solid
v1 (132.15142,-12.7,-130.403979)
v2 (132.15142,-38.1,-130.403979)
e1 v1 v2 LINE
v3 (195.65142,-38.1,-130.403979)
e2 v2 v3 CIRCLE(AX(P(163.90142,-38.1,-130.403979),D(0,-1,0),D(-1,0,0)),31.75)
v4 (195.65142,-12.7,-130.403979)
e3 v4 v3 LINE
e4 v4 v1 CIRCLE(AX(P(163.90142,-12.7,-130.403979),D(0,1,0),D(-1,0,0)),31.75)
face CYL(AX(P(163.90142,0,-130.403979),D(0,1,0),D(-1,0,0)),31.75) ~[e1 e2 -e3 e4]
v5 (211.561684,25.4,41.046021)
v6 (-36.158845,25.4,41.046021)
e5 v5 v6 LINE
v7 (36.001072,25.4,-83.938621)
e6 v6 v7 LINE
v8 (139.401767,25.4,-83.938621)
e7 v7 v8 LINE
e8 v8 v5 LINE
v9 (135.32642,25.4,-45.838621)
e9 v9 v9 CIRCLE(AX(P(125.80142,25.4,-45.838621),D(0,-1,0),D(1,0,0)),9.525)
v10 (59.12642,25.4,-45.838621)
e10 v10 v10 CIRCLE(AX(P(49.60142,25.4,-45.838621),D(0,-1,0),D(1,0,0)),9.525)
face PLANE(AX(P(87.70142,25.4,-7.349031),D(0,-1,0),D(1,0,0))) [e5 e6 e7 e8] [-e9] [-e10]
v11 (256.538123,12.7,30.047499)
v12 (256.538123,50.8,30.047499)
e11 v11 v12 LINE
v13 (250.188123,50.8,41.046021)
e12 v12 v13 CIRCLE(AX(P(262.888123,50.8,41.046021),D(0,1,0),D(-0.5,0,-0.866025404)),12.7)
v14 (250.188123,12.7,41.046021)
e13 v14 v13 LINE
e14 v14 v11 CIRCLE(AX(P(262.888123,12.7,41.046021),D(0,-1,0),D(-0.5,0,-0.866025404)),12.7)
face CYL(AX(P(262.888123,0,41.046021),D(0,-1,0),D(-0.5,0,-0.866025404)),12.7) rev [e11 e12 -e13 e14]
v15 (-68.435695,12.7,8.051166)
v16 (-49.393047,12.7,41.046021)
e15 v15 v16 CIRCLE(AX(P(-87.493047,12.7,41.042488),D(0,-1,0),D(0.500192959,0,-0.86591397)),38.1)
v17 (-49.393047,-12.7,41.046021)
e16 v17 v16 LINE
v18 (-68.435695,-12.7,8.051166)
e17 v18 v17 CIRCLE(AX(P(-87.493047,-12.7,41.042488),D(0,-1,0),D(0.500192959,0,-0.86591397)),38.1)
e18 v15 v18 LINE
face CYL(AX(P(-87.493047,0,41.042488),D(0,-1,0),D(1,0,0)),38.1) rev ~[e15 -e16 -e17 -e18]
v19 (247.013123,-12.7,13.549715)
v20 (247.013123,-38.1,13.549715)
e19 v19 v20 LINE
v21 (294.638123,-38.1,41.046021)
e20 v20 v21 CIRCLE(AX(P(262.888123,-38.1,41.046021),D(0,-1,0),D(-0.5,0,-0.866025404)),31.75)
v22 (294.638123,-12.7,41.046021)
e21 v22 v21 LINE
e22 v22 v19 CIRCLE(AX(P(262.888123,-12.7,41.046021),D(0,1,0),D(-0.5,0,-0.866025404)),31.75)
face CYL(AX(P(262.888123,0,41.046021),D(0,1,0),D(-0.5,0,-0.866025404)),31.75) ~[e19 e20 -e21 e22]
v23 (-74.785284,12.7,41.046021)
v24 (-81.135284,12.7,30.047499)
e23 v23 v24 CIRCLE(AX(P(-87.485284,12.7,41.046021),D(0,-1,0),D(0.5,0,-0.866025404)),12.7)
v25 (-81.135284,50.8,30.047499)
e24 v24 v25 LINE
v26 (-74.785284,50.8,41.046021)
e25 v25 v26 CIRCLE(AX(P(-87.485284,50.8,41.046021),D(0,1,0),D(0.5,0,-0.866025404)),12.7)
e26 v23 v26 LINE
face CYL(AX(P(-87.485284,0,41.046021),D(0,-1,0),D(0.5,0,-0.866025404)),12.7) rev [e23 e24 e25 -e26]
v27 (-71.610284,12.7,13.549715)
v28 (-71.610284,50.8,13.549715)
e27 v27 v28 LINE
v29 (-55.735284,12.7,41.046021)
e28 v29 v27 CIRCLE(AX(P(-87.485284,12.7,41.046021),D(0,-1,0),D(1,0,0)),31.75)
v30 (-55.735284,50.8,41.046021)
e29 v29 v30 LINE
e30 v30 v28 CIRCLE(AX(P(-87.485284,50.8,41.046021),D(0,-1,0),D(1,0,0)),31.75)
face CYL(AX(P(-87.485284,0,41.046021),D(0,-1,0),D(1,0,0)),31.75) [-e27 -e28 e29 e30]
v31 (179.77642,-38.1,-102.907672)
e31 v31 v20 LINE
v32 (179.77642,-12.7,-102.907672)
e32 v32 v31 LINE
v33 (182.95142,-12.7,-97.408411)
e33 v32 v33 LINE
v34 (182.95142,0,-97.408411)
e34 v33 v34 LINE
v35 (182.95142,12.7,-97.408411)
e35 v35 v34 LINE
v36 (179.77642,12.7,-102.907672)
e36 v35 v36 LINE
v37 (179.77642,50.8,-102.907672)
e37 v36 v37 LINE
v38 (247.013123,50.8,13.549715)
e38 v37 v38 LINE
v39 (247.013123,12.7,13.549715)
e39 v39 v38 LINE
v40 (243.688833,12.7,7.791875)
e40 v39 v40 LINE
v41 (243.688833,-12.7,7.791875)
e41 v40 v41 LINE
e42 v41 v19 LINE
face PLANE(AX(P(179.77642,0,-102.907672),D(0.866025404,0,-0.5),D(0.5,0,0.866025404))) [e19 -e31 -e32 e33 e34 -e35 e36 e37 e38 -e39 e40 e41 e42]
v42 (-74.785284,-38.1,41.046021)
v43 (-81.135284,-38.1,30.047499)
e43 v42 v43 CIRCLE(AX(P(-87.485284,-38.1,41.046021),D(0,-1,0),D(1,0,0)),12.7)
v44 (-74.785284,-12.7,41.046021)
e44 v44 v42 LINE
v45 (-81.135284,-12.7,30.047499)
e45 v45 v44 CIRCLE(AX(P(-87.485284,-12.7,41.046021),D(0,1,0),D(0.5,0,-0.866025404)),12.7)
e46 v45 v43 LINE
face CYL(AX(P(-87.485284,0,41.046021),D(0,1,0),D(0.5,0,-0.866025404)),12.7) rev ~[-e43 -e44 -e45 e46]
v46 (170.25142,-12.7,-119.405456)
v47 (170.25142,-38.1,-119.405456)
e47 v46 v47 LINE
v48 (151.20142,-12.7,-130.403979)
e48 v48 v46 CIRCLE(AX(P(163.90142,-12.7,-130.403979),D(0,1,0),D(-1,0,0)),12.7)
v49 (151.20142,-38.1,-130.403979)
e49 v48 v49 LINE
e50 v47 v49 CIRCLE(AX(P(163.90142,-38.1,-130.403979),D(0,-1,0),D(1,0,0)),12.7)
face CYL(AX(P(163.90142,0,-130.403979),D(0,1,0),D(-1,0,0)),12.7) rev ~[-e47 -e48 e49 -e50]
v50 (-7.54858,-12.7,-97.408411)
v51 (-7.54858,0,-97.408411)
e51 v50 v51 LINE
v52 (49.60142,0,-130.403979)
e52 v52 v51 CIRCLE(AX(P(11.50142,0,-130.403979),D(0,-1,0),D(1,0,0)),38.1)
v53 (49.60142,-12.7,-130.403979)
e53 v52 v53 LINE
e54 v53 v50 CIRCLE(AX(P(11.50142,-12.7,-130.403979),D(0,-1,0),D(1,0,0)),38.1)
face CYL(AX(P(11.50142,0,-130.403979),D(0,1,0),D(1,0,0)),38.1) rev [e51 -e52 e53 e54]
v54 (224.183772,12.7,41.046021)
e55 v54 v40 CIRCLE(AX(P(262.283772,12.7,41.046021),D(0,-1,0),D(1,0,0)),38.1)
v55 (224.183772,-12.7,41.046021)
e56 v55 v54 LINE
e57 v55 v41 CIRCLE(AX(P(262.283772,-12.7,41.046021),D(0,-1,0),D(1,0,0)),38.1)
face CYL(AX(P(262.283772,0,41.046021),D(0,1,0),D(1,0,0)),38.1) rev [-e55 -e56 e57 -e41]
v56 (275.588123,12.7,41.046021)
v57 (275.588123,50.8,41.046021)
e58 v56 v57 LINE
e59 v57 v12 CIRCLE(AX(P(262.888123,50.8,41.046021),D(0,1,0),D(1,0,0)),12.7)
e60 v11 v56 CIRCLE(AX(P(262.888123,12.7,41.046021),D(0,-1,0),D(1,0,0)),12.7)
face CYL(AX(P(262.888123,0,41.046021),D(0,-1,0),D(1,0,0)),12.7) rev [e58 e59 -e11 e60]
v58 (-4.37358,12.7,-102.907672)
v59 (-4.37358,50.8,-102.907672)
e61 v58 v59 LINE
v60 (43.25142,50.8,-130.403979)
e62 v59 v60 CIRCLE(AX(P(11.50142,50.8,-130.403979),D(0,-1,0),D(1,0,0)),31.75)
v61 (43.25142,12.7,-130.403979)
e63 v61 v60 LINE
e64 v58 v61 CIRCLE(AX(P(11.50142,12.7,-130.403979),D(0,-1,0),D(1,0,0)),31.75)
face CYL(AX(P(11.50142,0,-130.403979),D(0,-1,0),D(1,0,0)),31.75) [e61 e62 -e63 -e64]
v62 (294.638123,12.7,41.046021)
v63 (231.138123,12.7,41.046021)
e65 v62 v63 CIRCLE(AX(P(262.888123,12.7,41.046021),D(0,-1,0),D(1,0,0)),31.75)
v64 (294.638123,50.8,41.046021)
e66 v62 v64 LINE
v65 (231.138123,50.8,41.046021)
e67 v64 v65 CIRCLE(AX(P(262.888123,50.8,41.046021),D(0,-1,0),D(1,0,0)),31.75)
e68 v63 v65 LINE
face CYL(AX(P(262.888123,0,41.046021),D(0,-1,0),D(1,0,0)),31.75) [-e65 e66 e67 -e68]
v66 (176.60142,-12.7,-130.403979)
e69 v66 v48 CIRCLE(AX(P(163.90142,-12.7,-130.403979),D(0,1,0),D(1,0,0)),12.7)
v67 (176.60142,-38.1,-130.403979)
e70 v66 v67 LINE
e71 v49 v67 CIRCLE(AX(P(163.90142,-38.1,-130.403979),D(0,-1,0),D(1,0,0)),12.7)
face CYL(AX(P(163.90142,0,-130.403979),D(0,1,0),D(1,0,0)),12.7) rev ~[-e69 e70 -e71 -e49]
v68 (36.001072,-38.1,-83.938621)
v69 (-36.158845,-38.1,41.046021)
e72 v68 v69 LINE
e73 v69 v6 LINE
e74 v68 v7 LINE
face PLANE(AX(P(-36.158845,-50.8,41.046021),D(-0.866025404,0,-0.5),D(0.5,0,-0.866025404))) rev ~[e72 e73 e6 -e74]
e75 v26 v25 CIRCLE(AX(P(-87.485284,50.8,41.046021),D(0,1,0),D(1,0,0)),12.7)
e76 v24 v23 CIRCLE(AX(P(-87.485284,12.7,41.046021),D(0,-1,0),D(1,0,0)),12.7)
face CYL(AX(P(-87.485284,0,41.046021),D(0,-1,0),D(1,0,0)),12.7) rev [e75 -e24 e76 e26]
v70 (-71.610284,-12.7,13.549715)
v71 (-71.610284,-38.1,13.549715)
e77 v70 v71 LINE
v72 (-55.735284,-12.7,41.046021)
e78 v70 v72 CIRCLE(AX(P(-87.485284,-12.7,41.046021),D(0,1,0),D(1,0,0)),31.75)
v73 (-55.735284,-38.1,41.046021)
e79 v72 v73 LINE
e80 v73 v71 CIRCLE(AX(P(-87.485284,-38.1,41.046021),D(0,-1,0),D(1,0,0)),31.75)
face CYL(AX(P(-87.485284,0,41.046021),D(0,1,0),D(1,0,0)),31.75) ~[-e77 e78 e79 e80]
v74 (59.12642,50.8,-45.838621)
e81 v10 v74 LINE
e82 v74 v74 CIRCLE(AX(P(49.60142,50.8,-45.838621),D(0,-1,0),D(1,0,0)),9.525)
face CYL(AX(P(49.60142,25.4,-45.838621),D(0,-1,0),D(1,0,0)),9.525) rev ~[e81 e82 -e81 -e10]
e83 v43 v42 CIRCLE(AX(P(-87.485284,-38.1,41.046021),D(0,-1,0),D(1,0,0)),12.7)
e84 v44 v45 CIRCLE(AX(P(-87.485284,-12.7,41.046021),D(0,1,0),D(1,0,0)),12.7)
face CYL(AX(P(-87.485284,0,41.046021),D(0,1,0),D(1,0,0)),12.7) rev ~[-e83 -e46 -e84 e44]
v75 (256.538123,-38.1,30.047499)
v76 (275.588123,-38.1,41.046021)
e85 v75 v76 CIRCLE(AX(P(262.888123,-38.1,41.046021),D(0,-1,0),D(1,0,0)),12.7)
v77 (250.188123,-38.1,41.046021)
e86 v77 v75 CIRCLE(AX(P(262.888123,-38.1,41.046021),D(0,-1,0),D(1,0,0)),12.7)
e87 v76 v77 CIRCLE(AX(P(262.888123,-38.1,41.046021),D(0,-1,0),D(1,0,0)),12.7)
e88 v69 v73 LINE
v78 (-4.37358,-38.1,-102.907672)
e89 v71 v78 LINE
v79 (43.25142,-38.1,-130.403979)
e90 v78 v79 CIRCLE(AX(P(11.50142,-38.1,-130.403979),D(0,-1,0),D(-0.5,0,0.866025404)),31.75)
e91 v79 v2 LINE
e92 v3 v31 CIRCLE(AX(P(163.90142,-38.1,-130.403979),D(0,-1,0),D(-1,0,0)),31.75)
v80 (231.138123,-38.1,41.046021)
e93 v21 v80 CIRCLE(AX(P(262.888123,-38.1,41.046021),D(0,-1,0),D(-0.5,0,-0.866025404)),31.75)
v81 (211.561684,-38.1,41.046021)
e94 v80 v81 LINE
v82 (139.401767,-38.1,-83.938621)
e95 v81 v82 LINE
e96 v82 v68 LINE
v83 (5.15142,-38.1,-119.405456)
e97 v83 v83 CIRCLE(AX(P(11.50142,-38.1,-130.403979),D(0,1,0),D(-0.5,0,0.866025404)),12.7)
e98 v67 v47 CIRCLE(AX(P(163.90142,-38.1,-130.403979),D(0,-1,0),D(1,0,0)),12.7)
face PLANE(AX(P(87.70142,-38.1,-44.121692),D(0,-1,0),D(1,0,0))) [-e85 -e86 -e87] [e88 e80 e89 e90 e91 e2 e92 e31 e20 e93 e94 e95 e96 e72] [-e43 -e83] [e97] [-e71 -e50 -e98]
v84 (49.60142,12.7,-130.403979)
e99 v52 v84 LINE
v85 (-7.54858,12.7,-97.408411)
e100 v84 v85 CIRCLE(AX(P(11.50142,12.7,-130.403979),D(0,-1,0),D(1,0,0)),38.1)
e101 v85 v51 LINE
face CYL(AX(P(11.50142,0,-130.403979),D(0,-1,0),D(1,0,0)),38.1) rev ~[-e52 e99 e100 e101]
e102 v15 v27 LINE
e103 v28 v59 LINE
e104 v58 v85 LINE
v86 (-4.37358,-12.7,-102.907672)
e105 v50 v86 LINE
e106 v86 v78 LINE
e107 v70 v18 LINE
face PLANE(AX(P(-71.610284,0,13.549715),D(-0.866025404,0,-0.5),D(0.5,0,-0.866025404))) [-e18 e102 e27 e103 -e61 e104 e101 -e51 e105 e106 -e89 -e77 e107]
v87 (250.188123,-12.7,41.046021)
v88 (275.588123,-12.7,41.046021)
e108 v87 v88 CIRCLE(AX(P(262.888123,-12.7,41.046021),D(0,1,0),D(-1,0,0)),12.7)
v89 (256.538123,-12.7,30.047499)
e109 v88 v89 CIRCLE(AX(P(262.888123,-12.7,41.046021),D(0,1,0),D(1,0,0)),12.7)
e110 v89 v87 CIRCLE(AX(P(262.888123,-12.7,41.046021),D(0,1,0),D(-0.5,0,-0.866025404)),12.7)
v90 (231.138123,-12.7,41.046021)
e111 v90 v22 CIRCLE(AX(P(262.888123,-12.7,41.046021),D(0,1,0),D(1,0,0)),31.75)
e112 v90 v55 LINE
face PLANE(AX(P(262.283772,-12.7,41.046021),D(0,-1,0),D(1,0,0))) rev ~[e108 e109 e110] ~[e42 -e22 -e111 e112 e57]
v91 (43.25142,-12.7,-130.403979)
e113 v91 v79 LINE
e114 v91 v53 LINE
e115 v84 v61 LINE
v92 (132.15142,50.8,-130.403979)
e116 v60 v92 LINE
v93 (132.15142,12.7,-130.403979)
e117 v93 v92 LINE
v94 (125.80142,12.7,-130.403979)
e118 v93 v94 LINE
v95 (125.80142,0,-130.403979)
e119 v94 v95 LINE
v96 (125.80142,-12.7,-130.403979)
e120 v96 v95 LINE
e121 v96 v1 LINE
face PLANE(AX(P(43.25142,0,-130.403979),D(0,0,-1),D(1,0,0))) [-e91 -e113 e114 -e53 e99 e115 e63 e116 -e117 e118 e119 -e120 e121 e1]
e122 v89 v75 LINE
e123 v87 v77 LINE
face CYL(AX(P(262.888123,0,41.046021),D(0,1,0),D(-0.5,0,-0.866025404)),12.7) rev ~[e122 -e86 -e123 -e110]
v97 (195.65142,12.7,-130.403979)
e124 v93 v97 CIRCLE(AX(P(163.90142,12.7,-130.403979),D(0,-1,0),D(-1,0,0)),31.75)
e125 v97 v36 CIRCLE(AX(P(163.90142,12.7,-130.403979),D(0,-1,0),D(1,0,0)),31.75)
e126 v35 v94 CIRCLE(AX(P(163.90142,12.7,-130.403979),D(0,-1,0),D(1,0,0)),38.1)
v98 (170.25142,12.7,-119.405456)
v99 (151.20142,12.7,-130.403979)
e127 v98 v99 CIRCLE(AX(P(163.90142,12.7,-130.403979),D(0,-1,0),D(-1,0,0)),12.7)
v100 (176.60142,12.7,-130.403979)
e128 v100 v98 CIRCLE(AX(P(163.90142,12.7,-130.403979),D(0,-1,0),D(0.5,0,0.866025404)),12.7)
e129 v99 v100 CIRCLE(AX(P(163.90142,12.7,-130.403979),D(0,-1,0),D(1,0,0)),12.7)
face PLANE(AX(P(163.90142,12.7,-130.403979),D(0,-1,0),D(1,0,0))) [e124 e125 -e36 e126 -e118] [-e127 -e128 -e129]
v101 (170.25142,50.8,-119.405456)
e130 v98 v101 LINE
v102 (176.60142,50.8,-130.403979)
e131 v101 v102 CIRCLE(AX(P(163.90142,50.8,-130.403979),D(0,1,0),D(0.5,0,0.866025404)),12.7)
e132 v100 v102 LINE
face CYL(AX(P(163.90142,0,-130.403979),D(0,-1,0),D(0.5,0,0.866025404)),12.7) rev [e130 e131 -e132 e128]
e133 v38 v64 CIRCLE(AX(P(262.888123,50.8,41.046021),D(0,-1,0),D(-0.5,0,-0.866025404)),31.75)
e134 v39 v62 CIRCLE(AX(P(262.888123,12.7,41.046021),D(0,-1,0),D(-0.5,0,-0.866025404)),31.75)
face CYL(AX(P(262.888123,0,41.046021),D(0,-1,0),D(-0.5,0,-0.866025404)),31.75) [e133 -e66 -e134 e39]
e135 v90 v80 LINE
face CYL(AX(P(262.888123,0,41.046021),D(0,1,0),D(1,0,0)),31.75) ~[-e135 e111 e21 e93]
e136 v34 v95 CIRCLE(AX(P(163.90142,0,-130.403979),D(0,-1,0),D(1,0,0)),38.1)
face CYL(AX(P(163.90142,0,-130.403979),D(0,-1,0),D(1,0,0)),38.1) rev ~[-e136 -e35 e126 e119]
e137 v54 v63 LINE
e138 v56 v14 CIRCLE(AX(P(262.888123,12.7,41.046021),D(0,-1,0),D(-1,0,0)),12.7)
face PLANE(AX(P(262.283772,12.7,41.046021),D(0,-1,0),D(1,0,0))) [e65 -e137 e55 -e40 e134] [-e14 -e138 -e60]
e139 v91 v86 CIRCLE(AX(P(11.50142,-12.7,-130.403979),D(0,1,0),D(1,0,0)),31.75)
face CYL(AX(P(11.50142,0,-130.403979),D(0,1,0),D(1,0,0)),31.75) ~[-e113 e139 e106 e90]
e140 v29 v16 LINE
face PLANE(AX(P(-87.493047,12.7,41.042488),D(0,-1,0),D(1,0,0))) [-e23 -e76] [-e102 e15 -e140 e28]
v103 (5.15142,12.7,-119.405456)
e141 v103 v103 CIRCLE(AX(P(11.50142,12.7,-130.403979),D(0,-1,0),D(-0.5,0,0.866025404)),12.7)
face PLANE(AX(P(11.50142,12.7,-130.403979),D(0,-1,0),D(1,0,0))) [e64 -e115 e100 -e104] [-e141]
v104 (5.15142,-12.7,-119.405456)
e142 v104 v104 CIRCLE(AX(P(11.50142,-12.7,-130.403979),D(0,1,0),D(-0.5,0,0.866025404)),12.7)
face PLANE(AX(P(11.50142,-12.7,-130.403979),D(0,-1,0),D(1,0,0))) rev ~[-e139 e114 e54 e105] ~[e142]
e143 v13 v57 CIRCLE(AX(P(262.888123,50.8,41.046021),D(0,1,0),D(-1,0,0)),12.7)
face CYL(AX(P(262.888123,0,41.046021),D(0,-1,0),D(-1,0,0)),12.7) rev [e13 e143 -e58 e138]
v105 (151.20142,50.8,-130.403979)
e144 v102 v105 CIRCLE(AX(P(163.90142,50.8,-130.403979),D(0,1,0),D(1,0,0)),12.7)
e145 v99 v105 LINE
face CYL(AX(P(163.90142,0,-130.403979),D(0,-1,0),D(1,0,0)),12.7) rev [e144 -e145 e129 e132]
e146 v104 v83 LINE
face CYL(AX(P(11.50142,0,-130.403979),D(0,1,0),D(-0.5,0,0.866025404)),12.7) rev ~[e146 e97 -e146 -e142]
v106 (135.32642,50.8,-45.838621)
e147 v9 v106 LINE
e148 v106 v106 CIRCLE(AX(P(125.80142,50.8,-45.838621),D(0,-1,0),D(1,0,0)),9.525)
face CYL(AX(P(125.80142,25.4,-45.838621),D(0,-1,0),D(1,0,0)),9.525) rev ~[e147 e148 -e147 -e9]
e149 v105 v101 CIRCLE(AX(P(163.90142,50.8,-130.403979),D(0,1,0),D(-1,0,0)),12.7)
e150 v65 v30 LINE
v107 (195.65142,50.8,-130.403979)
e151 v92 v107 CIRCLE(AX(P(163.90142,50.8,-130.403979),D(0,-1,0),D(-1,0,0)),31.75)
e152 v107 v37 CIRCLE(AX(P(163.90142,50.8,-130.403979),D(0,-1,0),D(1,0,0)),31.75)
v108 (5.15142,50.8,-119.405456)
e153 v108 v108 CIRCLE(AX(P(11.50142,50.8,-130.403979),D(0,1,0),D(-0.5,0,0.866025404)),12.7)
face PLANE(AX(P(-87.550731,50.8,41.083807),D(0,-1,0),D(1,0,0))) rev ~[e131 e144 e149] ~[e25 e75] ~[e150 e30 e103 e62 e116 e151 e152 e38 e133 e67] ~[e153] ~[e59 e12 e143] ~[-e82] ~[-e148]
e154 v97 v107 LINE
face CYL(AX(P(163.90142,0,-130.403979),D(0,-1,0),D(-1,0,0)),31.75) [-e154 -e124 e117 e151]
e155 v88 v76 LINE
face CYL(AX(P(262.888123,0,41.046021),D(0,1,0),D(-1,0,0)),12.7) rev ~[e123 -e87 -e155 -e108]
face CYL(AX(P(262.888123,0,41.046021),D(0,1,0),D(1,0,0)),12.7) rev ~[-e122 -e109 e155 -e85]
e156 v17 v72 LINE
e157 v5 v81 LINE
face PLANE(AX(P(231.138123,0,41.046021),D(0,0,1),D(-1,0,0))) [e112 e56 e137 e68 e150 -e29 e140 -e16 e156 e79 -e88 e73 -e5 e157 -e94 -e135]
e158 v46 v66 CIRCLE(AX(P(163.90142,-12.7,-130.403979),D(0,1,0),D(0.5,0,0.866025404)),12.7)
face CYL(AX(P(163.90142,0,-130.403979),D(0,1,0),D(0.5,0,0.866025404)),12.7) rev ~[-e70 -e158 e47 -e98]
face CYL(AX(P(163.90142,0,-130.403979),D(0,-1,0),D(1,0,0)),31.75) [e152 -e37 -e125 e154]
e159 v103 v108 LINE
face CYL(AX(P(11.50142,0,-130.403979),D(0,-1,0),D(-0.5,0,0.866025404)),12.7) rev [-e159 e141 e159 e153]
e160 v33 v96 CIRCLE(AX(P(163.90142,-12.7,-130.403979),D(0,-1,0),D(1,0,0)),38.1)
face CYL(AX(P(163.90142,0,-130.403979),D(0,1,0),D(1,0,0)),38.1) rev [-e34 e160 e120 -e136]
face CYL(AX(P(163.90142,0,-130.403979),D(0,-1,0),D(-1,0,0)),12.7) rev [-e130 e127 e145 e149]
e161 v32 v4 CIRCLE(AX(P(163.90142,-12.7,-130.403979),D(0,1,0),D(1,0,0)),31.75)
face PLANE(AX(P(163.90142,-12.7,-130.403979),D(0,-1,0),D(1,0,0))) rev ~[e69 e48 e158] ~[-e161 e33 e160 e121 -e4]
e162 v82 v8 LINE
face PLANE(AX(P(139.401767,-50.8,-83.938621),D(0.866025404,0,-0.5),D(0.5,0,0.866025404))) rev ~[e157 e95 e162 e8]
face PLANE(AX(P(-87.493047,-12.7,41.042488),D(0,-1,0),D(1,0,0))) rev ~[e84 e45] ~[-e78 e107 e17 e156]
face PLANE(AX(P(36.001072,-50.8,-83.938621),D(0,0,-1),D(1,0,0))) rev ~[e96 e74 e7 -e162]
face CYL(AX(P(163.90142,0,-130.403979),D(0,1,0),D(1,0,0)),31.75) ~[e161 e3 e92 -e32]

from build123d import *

# Parameters (mm, degrees)
F1_DEPTH  = 50.8
F3_DEPTH  = 76.2
F4_R      = 38.1
F1_FACE_R = 12.7
F5_DEPTH  = 12.7
F6_R      = 9.525
F7_DEPTH  = 25.401


with BuildPart() as f1:
    # F0 (on Front) → F1 (new body, symmetric)
    with BuildSketch(Plane.XZ):
        with BuildLine():
            ThreePointArc((-81.1352841451, 30.047498821), (-98.4838067731, 47.3960214491), (-74.7852841451, 41.0460214491))
            Line((-74.7852841451, 41.0460214491), (-55.7352841451, 41.0460214491))
            ThreePointArc((-55.7352841451, 41.0460214491), (-114.9815907152, 56.9210214491), (-71.6102841451, 13.5497148789))
            Line((-71.6102841451, 13.5497148789), (-81.1352841451, 30.047498821))
        make_face()
        with BuildLine():
            ThreePointArc((294.63812316, 41.0460214491), (262.88812316, 72.7960214491), (231.13812316, 41.0460214491))
            Line((231.13812316, 41.0460214491), (250.18812316, 41.0460214491))
            ThreePointArc((250.18812316, 41.0460214491), (262.88812316, 53.7460214491), (275.58812316, 41.0460214491))
            ThreePointArc((275.58812316, 41.0460214491), (269.23812316, 30.047498821), (256.53812316, 30.047498821))
            Line((256.53812316, 30.047498821), (247.01312316, 13.5497148789))
            ThreePointArc((247.01312316, 13.5497148789), (278.76312316, 13.5497148789), (294.63812316, 41.0460214491))
        make_face()
        with BuildLine():
            ThreePointArc((195.6514195075, -130.4039785509), (191.3977260776, -114.5289785509), (179.7764195075, -102.9076719808))
            Line((179.7764195075, -102.9076719808), (170.2514195075, -119.4054559229))
            ThreePointArc((170.2514195075, -119.4054559229), (174.8999421355, -124.0539785509), (176.6014195075, -130.4039785509))
            ThreePointArc((176.6014195075, -130.4039785509), (163.9014195075, -143.1039785509), (151.2014195075, -130.4039785509))
            Line((151.2014195075, -130.4039785509), (132.1514195075, -130.4039785509))
            ThreePointArc((132.1514195075, -130.4039785509), (163.9014195075, -162.1539785509), (195.6514195075, -130.4039785509))
        make_face()
        with BuildLine():
            Line((5.1514195075, -119.4054559229), (-4.3735804925, -102.9076719808))
            ThreePointArc((-4.3735804925, -102.9076719808), (-4.3735804925, -157.9002851211), (43.2514195075, -130.4039785509))
            Line((43.2514195075, -130.4039785509), (24.2014195075, -130.4039785509))
            ThreePointArc((24.2014195075, -130.4039785509), (5.1514195075, -141.402501179), (5.1514195075, -119.4054559229))
        make_face()
        with BuildLine():
            ThreePointArc((43.2514195075, -130.4039785509), (27.3764195075, -102.9076719808), (-4.3735804925, -102.9076719808))
            Line((-4.3735804925, -102.9076719808), (5.1514195075, -119.4054559229))
            ThreePointArc((5.1514195075, -119.4054559229), (17.8514195075, -119.4054559229), (24.2014195075, -130.4039785509))
            Line((24.2014195075, -130.4039785509), (43.2514195075, -130.4039785509))
        make_face()
        with BuildLine():
            Line((-55.7352841451, 41.0460214491), (-74.7852841451, 41.0460214491))
            ThreePointArc((-74.7852841451, 41.0460214491), (-76.486761517, 34.6960214491), (-81.1352841451, 30.047498821))
            Line((-81.1352841451, 30.047498821), (-71.6102841451, 13.5497148789))
            ThreePointArc((-71.6102841451, 13.5497148789), (-59.9889775749, 25.1710214491), (-55.7352841451, 41.0460214491))
        make_face()
        with BuildLine():
            Line((250.18812316, 41.0460214491), (231.13812316, 41.0460214491))
            ThreePointArc((231.13812316, 41.0460214491), (235.3918165899, 25.1710214491), (247.01312316, 13.5497148789))
            Line((247.01312316, 13.5497148789), (256.53812316, 30.047498821))
            ThreePointArc((256.53812316, 30.047498821), (251.889600532, 34.6960214491), (250.18812316, 41.0460214491))
        make_face()
        with BuildLine():
            Line((170.2514195075, -119.4054559229), (179.7764195075, -102.9076719808))
            ThreePointArc((179.7764195075, -102.9076719808), (148.0264195075, -102.9076719808), (132.1514195075, -130.4039785509))
            Line((132.1514195075, -130.4039785509), (151.2014195075, -130.4039785509))
            ThreePointArc((151.2014195075, -130.4039785509), (157.5514195075, -119.4054559229), (170.2514195075, -119.4054559229))
        make_face()
        with BuildLine():
            Line((231.13812316, 41.0460214491), (-55.7352841451, 41.0460214491))
            ThreePointArc((-55.7352841451, 41.0460214491), (-59.9889775749, 25.1710214491), (-71.6102841451, 13.5497148789))
            Line((-71.6102841451, 13.5497148789), (-4.3735804925, -102.9076719808))
            ThreePointArc((-4.3735804925, -102.9076719808), (27.3764195075, -102.9076719808), (43.2514195075, -130.4039785509))
            Line((43.2514195075, -130.4039785509), (132.1514195075, -130.4039785509))
            ThreePointArc((132.1514195075, -130.4039785509), (148.0264195075, -102.9076719808), (179.7764195075, -102.9076719808))
            Line((179.7764195075, -102.9076719808), (247.01312316, 13.5497148789))
            ThreePointArc((247.01312316, 13.5497148789), (235.3918165899, 25.1710214491), (231.13812316, 41.0460214491))
        make_face()
    extrude(amount=F1_DEPTH, both=True)

    # F2 (on face) → F3 (cut)
    with BuildSketch(Plane.XZ.offset(50.8)):
        Polygon((211.5616842291, 41.0460214491), (-36.1588452141, 41.0460214491), (36.0010718467, -83.9386211703), (139.4017671682, -83.9386211703), align=None)
    extrude(amount=-F3_DEPTH, mode=Mode.SUBTRACT)

    # F4 (on Front) + F1_face (on face) → F5 (cut, symmetric)
    with BuildSketch(Plane.XZ):
        with Locations((-87.4930471182, 41.0424880683)):
            Circle(F4_R)
        with Locations((262.2837722301, 41.0460214491)):
            Circle(F4_R)
        with Locations((163.9014195075, -130.4039785509)):
            Circle(F4_R)
        with Locations((11.5014195075, -130.4039785509)):
            Circle(F4_R)
    with BuildSketch(Plane(origin=(87.7014195075, -50.8, -33.7225685026), x_dir=(1, 0, 0), z_dir=(0, -1, 0))):
        with BuildLine():
            Line((-123.8602647216, 74.7685899517), (-143.4367036526, 74.7685899517))
            ThreePointArc((-143.4367036526, 74.7685899517), (-202.6830102227, 90.6435899517), (-159.3117036526, 47.2722833815))
            Line((-159.3117036526, 47.2722833815), (-92.075, -69.1851034782))
            ThreePointArc((-92.075, -69.1851034782), (-92.075, -124.1777166185), (-44.45, -96.6814100483))
            Line((-44.45, -96.6814100483), (44.45, -96.6814100483))
            ThreePointArc((44.45, -96.6814100483), (92.075, -124.1777166185), (92.075, -69.1851034782))
            Line((92.075, -69.1851034782), (159.3117036526, 47.2722833815))
            ThreePointArc((159.3117036526, 47.2722833815), (202.6830102227, 90.6435899517), (143.4367036526, 74.7685899517))
            Line((143.4367036526, 74.7685899517), (123.8602647216, 74.7685899517))
            Line((123.8602647216, 74.7685899517), (51.7003476608, -50.2160526677))
            Line((51.7003476608, -50.2160526677), (-51.7003476608, -50.2160526677))
            Line((-51.7003476608, -50.2160526677), (-123.8602647216, 74.7685899517))
        make_face()
        with Locations((-76.2, -96.6814100483)):
            Circle(F1_FACE_R, mode=Mode.SUBTRACT)
        with Locations((76.2, -96.6814100483)):
            Circle(F1_FACE_R, mode=Mode.SUBTRACT)
        with Locations((-175.1867036526, 74.7685899517)):
            Circle(F1_FACE_R, mode=Mode.SUBTRACT)
        with Locations((175.1867036526, 74.7685899517)):
            Circle(F1_FACE_R, mode=Mode.SUBTRACT)
    extrude(amount=F5_DEPTH, both=True, mode=Mode.SUBTRACT)

    # F6 (on face) → F7 (cut, through all)
    with BuildSketch(Plane.XZ.offset(-25.4)):
        with Locations((49.6014195075, -45.8386211703)):
            Circle(F6_R)
        with Locations((125.8014195075, -45.8386211703)):
            Circle(F6_R)
    extrude(amount=-F7_DEPTH, mode=Mode.SUBTRACT)


solid = f1.part
